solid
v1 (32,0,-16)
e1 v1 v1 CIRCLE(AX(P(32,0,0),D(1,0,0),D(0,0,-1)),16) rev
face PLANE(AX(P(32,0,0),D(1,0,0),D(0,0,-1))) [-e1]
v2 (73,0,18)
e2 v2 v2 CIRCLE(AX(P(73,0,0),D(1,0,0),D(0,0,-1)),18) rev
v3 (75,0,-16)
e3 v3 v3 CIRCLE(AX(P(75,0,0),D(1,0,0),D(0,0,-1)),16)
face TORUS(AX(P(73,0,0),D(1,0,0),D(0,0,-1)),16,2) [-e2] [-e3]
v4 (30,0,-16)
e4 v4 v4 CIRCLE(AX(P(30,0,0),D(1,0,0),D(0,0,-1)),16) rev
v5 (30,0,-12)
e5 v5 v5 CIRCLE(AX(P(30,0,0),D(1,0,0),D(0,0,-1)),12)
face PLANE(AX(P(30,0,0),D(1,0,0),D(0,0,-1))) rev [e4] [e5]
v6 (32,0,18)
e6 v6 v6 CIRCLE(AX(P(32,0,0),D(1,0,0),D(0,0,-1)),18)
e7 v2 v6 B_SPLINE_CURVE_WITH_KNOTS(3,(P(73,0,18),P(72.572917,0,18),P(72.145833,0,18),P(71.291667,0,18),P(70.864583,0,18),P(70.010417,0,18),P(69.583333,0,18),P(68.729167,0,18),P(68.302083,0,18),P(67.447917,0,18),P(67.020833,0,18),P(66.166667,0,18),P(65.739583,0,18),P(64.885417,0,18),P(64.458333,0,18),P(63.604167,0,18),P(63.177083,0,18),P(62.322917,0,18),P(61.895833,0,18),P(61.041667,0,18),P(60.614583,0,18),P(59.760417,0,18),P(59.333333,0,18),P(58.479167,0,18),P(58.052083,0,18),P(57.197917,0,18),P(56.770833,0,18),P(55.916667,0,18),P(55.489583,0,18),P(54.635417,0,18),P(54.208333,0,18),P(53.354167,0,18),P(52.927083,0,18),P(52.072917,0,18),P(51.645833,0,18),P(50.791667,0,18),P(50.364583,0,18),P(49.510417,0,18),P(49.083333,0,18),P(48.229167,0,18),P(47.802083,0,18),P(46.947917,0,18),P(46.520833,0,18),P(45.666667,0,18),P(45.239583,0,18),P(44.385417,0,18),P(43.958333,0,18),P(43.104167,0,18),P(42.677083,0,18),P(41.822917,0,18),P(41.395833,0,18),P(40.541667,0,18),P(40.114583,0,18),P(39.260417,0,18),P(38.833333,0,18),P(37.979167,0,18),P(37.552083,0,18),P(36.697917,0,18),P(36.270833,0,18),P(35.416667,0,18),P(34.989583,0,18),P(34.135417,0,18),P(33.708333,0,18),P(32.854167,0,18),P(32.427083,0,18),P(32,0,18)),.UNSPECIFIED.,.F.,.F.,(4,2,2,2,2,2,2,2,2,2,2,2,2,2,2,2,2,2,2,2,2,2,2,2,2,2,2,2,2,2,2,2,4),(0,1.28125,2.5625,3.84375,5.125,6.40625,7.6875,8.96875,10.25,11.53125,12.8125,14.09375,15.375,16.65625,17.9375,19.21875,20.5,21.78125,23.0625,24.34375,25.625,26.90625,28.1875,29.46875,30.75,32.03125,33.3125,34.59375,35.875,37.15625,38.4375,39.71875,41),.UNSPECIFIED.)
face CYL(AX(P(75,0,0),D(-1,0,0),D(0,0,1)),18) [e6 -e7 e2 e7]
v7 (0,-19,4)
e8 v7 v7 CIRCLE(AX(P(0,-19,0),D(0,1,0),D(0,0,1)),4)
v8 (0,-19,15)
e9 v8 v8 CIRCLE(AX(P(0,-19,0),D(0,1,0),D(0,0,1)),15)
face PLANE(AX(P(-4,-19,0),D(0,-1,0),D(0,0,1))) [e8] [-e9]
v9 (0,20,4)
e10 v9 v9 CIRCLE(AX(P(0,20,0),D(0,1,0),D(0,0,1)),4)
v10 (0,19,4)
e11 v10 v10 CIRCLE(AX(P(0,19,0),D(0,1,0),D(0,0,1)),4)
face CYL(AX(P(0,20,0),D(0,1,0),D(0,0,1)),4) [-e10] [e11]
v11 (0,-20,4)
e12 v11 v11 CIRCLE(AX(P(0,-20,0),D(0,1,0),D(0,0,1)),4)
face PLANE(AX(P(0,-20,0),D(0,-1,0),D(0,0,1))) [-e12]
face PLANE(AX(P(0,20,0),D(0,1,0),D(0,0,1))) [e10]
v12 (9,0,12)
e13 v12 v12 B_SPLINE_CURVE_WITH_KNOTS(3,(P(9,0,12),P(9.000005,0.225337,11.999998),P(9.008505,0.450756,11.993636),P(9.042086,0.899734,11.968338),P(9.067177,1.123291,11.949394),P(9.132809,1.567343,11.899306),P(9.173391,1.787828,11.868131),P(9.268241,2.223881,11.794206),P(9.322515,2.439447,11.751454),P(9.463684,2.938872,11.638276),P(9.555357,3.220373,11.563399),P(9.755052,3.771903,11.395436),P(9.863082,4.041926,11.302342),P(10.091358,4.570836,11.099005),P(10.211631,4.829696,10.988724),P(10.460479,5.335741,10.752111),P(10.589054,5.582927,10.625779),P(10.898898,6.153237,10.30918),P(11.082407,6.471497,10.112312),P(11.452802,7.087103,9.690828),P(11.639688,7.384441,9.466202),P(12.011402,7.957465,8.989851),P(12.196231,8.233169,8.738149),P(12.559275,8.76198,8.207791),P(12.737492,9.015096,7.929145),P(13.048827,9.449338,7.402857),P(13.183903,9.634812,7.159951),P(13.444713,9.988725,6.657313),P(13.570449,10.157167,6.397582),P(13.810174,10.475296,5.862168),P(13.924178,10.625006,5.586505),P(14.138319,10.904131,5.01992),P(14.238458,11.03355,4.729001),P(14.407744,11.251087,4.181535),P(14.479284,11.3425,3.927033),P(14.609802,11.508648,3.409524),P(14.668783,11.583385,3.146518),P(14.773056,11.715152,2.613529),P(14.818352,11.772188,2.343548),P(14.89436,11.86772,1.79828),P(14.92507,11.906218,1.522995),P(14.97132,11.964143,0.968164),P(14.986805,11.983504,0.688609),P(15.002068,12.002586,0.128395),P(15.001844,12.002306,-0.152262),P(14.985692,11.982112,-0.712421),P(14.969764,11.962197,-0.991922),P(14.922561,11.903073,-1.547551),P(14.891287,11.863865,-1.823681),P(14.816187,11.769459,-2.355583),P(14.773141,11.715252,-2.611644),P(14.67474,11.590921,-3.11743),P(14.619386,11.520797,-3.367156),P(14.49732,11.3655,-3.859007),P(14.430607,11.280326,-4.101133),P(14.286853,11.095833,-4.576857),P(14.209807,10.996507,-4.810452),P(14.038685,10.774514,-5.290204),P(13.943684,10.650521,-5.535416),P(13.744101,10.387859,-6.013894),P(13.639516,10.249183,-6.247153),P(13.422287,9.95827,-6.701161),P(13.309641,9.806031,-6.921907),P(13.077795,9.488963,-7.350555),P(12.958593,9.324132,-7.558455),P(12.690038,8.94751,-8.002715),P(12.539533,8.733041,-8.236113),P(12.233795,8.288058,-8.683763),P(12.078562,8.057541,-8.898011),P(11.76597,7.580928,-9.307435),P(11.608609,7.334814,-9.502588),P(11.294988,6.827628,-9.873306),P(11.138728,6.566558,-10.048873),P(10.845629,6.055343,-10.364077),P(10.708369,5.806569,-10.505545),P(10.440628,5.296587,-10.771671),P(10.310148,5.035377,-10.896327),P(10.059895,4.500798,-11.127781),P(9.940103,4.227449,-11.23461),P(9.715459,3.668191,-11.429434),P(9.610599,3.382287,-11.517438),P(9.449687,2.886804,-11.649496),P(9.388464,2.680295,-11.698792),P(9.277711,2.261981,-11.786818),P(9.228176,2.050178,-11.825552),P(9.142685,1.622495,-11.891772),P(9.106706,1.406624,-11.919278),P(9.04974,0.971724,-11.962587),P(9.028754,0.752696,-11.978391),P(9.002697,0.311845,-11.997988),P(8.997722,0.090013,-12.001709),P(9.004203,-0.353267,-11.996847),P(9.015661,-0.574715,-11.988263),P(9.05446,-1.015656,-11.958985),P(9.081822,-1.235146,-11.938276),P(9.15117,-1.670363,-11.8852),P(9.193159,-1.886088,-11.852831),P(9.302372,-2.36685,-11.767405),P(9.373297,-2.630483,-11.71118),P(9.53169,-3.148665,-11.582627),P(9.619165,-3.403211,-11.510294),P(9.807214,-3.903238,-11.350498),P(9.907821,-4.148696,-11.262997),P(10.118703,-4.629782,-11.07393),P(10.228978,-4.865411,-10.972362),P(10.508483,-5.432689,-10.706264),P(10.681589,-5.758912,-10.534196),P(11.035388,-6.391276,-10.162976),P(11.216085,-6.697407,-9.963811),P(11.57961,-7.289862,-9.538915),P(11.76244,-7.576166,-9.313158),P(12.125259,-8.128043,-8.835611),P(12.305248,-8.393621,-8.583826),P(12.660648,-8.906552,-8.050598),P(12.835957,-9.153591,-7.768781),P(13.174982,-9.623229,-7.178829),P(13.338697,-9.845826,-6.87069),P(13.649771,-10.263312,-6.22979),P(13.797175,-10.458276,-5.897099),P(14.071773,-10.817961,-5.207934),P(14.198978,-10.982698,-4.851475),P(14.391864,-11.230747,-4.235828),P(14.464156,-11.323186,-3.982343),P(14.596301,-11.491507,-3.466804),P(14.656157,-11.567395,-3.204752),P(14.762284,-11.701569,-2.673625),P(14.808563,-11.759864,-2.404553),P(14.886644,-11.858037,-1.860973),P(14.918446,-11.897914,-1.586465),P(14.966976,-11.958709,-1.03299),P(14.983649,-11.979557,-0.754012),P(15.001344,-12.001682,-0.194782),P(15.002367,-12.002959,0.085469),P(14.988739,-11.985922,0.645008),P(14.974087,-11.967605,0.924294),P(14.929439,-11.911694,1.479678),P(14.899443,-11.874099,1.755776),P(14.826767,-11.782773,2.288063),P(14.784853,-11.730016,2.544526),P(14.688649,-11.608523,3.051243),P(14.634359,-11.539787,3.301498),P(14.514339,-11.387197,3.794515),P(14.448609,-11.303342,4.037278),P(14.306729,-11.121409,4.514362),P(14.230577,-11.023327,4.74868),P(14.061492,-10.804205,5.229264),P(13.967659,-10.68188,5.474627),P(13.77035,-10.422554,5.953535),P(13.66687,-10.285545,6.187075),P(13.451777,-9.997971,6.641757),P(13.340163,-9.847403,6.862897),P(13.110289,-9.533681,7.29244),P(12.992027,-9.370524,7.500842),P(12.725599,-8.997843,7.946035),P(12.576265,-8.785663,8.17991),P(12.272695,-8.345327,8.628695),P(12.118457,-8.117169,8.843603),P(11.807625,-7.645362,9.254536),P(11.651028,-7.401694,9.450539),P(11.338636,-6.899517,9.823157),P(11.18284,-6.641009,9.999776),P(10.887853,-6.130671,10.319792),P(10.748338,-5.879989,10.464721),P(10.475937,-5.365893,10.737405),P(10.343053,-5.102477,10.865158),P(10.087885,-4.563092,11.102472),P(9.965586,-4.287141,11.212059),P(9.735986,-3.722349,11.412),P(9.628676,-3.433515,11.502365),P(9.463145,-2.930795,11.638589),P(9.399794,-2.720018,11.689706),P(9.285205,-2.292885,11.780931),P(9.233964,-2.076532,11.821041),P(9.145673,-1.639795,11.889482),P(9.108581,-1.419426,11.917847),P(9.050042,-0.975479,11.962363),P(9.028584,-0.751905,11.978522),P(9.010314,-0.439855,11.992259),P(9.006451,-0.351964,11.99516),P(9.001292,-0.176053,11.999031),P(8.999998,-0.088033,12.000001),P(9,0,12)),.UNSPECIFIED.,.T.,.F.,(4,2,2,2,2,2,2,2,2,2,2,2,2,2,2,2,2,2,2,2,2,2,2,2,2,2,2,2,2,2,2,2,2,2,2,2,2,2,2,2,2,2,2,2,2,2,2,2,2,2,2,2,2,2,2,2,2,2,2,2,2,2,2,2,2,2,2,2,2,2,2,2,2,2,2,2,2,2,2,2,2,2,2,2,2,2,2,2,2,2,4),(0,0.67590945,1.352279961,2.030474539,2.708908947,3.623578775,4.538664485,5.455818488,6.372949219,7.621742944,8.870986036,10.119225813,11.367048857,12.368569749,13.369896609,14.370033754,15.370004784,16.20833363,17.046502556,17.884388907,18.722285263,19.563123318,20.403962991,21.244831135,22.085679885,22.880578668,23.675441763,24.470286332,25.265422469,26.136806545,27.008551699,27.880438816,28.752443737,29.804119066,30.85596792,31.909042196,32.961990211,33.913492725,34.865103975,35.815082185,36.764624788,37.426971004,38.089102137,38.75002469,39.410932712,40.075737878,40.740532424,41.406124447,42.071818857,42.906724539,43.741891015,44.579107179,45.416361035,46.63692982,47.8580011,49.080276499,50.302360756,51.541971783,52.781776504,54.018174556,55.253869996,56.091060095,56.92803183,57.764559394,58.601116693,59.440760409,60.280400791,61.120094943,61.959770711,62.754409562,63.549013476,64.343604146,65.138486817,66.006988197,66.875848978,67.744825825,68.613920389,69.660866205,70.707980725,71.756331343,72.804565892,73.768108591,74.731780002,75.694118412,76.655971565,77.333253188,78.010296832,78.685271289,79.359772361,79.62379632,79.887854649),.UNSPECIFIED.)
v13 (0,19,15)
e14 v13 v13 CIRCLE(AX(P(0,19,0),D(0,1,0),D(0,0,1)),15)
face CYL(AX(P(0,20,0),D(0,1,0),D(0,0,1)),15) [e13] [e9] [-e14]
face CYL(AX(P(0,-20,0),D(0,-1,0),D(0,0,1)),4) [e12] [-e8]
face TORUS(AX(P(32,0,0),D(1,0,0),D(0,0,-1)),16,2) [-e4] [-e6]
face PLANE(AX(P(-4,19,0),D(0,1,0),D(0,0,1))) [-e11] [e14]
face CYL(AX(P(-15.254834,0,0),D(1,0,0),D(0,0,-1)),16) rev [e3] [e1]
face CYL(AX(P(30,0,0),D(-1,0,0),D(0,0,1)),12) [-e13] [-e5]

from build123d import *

# Parameters (mm, degrees)
SKETCH_2_R          = 12
EXTRUDE_1_DEPTH     = 30
SKETCH_3_R          = 18
EXTRUDE_2_DEPTH     = 45
SKETCH_4_R          = 16
CUT_EXTRUDE_1_DEPTH = 43
FILLET_1_R          = 2


with BuildPart() as part:
    # 草图1 → 旋转1 (revolve)
    with BuildSketch(Plane.XY, mode=Mode.PRIVATE) as revolve_1_sk:
        Polygon((0, 20), (-4, 20), (-4, 19), (-15, 19), (-15, 0), (0, 0), align=None)
    revolve_1 = revolve(revolve_1_sk.sketch.rotate(Axis((0, 20, 0), (0, -1, 0)), 270), axis=Axis((0, 20, 0), (0, -1, 0)))

    # 镜向1: 旋转1 across plane
    add(revolve_1.mirror(Plane(origin=(0, 0, 0), x_dir=(0, 0, 1), z_dir=(0, -1, 0))))

    # 草图2 → 凸台-拉伸1 (add)
    with BuildSketch(Plane(origin=(0, 0, 0), x_dir=(0, 0, -1), z_dir=(1, 0, 0))):
        with Locations(Location((0, 0, 0), (0, 0, 180))):
            Circle(SKETCH_2_R)
    extrude(amount=EXTRUDE_1_DEPTH)

    # 草图3 → 凸台-拉伸2 (add)
    with BuildSketch(Plane(origin=(30, 0, 0), x_dir=(0, 0, -1), z_dir=(1, 0, 0))):
        with Locations(Location((0, 0, 0), (0, 0, 180))):
            Circle(SKETCH_3_R)
    extrude(amount=EXTRUDE_2_DEPTH)

    # 草图4 → 切除-拉伸1 (cut)
    with BuildSketch(Plane(origin=(75, 0, 0), x_dir=(0, 0, -1), z_dir=(1, 0, 0))):
        Circle(SKETCH_4_R)
    extrude(amount=-CUT_EXTRUDE_1_DEPTH, mode=Mode.SUBTRACT)

    # 圆角1
    fillet_1_edges = [part.edges().sort_by_distance(p)[0] for p in [
        (30, 0, -18),
        (75, 0, -18),
    ]]
    fillet(fillet_1_edges, radius=FILLET_1_R - 0.0001)  # a hair under: the kernel refuses the full size


solid = part.part
